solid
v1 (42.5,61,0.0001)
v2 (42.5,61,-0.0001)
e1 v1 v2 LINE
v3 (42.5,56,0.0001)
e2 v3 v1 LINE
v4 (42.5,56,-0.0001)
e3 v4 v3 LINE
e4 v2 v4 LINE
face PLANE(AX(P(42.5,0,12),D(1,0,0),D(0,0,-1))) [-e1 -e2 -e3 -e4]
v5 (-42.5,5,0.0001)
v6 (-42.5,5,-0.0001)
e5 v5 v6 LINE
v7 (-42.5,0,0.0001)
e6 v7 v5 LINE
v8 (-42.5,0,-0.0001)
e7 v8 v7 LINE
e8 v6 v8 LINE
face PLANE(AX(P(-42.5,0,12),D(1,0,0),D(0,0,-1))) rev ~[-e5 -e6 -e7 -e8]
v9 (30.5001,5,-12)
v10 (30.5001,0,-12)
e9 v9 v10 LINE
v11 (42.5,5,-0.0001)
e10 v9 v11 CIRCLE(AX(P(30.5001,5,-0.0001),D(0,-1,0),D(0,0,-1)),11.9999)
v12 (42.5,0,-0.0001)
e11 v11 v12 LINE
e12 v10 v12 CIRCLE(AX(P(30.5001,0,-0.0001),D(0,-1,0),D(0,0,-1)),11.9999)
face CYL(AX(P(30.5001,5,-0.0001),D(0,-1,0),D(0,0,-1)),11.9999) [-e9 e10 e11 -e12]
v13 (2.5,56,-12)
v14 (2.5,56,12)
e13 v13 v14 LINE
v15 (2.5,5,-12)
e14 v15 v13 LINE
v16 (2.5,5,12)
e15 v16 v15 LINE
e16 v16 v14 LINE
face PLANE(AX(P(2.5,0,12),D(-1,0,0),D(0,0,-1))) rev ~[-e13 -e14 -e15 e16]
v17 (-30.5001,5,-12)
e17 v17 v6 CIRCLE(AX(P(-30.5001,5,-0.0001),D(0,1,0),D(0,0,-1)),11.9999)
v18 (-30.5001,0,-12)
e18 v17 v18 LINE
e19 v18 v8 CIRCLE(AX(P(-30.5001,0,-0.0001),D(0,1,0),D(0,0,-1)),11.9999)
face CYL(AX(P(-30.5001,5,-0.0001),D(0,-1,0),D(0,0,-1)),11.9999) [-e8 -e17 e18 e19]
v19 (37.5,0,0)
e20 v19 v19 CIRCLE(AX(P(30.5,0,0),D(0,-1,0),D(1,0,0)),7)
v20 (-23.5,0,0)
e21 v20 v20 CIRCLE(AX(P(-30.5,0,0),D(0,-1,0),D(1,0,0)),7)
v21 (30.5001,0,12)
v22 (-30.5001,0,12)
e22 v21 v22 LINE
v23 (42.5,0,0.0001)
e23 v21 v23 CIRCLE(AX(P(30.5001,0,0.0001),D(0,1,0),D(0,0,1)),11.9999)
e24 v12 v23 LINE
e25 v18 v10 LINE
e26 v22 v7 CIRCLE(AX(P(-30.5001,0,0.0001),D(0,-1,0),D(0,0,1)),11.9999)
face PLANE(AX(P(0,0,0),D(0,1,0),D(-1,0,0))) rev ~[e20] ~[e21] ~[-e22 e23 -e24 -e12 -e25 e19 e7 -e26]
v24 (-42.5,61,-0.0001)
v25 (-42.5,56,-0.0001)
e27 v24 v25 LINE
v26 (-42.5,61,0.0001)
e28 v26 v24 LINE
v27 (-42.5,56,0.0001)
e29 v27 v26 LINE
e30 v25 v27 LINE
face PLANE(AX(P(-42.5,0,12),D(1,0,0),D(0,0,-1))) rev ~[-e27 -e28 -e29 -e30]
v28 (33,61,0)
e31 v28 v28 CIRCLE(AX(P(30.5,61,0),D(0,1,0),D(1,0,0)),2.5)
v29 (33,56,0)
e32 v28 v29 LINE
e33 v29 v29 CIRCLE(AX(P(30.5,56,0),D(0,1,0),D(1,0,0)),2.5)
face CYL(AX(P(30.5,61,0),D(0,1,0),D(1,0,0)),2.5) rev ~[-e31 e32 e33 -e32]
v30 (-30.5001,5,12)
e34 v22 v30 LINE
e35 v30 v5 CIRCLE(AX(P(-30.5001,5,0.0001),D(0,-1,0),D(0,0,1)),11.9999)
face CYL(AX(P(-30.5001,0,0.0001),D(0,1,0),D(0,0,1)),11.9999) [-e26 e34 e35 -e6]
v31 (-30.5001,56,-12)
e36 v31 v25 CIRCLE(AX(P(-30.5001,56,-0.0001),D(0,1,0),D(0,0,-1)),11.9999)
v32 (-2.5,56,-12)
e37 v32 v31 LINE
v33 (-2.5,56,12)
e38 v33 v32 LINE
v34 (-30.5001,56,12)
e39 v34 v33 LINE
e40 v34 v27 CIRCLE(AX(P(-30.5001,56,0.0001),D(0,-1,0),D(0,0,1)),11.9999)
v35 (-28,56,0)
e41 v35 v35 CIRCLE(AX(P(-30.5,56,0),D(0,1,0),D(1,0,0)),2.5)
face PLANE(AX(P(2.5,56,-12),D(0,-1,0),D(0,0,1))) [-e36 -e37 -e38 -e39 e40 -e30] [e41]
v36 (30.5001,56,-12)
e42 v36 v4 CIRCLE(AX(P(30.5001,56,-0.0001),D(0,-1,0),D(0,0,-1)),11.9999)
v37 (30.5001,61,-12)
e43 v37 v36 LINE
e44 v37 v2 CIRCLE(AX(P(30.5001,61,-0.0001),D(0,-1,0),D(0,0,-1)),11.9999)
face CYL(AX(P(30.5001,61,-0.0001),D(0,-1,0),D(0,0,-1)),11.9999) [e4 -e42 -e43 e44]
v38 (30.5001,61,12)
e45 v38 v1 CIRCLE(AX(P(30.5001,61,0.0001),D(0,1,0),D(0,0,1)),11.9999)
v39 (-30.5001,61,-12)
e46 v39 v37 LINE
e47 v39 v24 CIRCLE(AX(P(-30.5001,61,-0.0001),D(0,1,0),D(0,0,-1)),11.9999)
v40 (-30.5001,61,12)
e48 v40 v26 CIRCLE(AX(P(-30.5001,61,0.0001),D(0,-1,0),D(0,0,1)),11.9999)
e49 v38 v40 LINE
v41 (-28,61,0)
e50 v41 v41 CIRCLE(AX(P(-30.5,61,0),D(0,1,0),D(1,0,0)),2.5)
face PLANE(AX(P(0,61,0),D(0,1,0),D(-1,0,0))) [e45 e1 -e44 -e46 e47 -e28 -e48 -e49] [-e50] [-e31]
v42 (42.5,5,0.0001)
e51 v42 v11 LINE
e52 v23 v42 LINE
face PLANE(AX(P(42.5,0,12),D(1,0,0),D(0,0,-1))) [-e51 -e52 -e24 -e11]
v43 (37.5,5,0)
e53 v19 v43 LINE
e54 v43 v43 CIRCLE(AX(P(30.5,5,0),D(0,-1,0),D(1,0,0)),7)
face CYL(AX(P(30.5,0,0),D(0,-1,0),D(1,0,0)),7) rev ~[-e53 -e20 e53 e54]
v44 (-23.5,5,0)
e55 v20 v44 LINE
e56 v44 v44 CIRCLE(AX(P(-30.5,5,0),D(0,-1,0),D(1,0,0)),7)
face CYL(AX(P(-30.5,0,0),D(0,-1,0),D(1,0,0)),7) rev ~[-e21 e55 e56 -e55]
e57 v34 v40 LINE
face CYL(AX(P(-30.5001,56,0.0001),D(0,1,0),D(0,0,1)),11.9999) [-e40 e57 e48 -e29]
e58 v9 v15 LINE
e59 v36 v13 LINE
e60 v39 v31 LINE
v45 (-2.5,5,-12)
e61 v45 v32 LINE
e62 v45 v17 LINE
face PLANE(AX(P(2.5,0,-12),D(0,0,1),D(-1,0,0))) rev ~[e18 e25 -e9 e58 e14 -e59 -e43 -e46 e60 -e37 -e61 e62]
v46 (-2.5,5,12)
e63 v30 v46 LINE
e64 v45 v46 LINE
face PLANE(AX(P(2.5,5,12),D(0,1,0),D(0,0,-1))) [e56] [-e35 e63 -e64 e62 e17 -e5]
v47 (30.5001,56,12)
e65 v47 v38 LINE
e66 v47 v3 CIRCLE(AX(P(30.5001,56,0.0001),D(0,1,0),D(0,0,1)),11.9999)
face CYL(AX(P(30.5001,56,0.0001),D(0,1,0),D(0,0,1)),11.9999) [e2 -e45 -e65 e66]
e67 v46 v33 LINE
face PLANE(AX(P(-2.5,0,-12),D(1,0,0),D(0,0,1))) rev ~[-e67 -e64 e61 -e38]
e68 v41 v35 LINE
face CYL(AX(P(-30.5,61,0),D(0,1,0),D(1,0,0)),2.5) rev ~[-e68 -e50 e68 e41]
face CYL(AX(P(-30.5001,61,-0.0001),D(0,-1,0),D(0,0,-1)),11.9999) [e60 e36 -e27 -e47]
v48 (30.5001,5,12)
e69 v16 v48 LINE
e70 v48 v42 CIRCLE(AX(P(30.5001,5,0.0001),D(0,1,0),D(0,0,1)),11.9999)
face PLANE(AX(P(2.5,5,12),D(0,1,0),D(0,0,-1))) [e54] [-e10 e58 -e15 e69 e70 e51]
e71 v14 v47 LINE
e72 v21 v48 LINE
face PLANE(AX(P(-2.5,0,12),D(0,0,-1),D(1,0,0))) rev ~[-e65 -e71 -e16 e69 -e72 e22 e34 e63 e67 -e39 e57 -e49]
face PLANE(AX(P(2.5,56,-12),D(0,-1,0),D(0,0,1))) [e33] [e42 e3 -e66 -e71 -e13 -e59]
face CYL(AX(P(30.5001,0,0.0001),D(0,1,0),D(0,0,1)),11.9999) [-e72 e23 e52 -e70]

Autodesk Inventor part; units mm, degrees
ref_plane "YZ Plane" through (0, 0, 0) normal (1, 0, 0) x (0, 1, 0)
ref_plane "XZ Plane" through (0, 0, 0) normal (0, 1, 0) x (-1, 0, 0)
ref_plane "XY Plane" through (0, 0, 0) normal (0, 0, 1) x (1, 0, 0)
sketch "Sketch3" plane through (0, 0, 0) normal (0, 1, 0) x (-1, 0, 0)
  line L0 (2.5, 12) -> (-2.5, 12)
  line L1 (-2.5, 12) -> (-2.5, -12)
  line L2 (-2.5, -12) -> (2.5, -12)
  line L3 (2.5, -12) -> (2.5, 12)
  point P0 (0, 0)
  point P1 (0, 12)
  point P2 (2.5, 0)
  dimension "d6" = 5
  dimension "d7" = 24
extrude "Extrusion3" add sketch "Sketch3" along normal blind 61
sketch "Sketch4" plane through (2.5, 0, 12) normal (1, 0, 0) x (0, 0, -1)
  line L0 (0, 61) -> (24, 61)
  line L1 (24, 61) -> (24, 56)
  line L2 (24, 56) -> (0, 56)
  line L3 (0, 56) -> (0, 61)
  line L4 (0, 5) -> (24, 5)
  line L5 (24, 5) -> (24, 0)
  line L6 (24, 0) -> (0, 0)
  line L7 (0, 0) -> (0, 5)
  line L8 (0, 61) -> (24, 61) projected
  line L9 (0, 0) -> (24, 0) projected
  line L10 (0, 0) -> (0, 61) projected
  point P0 (12, 0)
  point P1 (12, 61)
  point P2 (12, 0)
  point P3 (12, 56)
  point P4 (12, 61)
  point P5 (12, 5)
  point P6 (12, 0)
  point P7 (0, 58.5)
  dimension "d10" = 5
extrude "Extrusion4" add sketch "Sketch4" along normal blind 40 and the other way blind 45
fillet "Fillet4" radius 12 8 edges at (42.5, 2.5, -12) (42.5, 2.5, 12) (42.5, 58.5, 12) (42.5, 58.5, -12) (-42.5, 58.5, 12) (-42.5, 2.5, 12) (-42.5, 58.5, -12) (-42.5, 2.5, -12)
sketch "Sketch8" plane through (0, 61, 0) normal (0, 1, 0) x (1, 0, 0)
  circle A0 centre (-30.5, 0) radius 2.5
  circle A1 centre (30.5, 0) radius 2.5
  arc A2 (-30.5, 12) -> (-30.5, -12) centre (-30.5, 0) ccw projected
  arc A3 (30.5, -12) -> (30.5, 12) centre (30.5, 0) ccw projected
  point P0 (0, 0)
  dimension "d27" = 5
extrude "Extrusion7" cut sketch "Sketch8" against normal up to surface (5 mm away)
sketch "Sketch9" plane through (0, 0, 0) normal (0, -1, 0) x (1, 0, 0)
  circle A0 centre (-30.5, 0) radius 7
  circle A1 centre (30.5, 0) radius 7
  arc A2 (-30.5, 12) -> (-30.5, -12) centre (-30.5, 0) ccw projected
  arc A3 (30.5, -12) -> (30.5, 12) centre (30.5, 0) ccw projected
  point P0 (0, 0)
  dimension "d30" = 14
extrude "Extrusion8" cut sketch "Sketch9" against normal up to next
equation "\"d6\" = b_mat_thickness"
equation "\"d7\" = sa_diameter"
equation "\"d8\" = sa_thickness + s_height + s_shaft_height + 3 * b_mat_thickness"
equation "\"d10\" = b_mat_thickness"
equation "\"d24\" = d11 + b_mat_thickness"
equation "\"d26\" = 0.5 * sa_diameter"
equation "\"d30\" = bb_outer_diameter"
equation "\"b_mat_thickness\" = 5"
equation "\"sa_diameter\" = 24"
equation "\"sa_thickness\" = 2"
equation "\"s_height\" = 38"
equation "\"s_shaft_height\" = 6"
equation "\"d11\" = 40"
equation "\"bb_outer_diameter\" = 14"
properties part number "Middle_leg"
